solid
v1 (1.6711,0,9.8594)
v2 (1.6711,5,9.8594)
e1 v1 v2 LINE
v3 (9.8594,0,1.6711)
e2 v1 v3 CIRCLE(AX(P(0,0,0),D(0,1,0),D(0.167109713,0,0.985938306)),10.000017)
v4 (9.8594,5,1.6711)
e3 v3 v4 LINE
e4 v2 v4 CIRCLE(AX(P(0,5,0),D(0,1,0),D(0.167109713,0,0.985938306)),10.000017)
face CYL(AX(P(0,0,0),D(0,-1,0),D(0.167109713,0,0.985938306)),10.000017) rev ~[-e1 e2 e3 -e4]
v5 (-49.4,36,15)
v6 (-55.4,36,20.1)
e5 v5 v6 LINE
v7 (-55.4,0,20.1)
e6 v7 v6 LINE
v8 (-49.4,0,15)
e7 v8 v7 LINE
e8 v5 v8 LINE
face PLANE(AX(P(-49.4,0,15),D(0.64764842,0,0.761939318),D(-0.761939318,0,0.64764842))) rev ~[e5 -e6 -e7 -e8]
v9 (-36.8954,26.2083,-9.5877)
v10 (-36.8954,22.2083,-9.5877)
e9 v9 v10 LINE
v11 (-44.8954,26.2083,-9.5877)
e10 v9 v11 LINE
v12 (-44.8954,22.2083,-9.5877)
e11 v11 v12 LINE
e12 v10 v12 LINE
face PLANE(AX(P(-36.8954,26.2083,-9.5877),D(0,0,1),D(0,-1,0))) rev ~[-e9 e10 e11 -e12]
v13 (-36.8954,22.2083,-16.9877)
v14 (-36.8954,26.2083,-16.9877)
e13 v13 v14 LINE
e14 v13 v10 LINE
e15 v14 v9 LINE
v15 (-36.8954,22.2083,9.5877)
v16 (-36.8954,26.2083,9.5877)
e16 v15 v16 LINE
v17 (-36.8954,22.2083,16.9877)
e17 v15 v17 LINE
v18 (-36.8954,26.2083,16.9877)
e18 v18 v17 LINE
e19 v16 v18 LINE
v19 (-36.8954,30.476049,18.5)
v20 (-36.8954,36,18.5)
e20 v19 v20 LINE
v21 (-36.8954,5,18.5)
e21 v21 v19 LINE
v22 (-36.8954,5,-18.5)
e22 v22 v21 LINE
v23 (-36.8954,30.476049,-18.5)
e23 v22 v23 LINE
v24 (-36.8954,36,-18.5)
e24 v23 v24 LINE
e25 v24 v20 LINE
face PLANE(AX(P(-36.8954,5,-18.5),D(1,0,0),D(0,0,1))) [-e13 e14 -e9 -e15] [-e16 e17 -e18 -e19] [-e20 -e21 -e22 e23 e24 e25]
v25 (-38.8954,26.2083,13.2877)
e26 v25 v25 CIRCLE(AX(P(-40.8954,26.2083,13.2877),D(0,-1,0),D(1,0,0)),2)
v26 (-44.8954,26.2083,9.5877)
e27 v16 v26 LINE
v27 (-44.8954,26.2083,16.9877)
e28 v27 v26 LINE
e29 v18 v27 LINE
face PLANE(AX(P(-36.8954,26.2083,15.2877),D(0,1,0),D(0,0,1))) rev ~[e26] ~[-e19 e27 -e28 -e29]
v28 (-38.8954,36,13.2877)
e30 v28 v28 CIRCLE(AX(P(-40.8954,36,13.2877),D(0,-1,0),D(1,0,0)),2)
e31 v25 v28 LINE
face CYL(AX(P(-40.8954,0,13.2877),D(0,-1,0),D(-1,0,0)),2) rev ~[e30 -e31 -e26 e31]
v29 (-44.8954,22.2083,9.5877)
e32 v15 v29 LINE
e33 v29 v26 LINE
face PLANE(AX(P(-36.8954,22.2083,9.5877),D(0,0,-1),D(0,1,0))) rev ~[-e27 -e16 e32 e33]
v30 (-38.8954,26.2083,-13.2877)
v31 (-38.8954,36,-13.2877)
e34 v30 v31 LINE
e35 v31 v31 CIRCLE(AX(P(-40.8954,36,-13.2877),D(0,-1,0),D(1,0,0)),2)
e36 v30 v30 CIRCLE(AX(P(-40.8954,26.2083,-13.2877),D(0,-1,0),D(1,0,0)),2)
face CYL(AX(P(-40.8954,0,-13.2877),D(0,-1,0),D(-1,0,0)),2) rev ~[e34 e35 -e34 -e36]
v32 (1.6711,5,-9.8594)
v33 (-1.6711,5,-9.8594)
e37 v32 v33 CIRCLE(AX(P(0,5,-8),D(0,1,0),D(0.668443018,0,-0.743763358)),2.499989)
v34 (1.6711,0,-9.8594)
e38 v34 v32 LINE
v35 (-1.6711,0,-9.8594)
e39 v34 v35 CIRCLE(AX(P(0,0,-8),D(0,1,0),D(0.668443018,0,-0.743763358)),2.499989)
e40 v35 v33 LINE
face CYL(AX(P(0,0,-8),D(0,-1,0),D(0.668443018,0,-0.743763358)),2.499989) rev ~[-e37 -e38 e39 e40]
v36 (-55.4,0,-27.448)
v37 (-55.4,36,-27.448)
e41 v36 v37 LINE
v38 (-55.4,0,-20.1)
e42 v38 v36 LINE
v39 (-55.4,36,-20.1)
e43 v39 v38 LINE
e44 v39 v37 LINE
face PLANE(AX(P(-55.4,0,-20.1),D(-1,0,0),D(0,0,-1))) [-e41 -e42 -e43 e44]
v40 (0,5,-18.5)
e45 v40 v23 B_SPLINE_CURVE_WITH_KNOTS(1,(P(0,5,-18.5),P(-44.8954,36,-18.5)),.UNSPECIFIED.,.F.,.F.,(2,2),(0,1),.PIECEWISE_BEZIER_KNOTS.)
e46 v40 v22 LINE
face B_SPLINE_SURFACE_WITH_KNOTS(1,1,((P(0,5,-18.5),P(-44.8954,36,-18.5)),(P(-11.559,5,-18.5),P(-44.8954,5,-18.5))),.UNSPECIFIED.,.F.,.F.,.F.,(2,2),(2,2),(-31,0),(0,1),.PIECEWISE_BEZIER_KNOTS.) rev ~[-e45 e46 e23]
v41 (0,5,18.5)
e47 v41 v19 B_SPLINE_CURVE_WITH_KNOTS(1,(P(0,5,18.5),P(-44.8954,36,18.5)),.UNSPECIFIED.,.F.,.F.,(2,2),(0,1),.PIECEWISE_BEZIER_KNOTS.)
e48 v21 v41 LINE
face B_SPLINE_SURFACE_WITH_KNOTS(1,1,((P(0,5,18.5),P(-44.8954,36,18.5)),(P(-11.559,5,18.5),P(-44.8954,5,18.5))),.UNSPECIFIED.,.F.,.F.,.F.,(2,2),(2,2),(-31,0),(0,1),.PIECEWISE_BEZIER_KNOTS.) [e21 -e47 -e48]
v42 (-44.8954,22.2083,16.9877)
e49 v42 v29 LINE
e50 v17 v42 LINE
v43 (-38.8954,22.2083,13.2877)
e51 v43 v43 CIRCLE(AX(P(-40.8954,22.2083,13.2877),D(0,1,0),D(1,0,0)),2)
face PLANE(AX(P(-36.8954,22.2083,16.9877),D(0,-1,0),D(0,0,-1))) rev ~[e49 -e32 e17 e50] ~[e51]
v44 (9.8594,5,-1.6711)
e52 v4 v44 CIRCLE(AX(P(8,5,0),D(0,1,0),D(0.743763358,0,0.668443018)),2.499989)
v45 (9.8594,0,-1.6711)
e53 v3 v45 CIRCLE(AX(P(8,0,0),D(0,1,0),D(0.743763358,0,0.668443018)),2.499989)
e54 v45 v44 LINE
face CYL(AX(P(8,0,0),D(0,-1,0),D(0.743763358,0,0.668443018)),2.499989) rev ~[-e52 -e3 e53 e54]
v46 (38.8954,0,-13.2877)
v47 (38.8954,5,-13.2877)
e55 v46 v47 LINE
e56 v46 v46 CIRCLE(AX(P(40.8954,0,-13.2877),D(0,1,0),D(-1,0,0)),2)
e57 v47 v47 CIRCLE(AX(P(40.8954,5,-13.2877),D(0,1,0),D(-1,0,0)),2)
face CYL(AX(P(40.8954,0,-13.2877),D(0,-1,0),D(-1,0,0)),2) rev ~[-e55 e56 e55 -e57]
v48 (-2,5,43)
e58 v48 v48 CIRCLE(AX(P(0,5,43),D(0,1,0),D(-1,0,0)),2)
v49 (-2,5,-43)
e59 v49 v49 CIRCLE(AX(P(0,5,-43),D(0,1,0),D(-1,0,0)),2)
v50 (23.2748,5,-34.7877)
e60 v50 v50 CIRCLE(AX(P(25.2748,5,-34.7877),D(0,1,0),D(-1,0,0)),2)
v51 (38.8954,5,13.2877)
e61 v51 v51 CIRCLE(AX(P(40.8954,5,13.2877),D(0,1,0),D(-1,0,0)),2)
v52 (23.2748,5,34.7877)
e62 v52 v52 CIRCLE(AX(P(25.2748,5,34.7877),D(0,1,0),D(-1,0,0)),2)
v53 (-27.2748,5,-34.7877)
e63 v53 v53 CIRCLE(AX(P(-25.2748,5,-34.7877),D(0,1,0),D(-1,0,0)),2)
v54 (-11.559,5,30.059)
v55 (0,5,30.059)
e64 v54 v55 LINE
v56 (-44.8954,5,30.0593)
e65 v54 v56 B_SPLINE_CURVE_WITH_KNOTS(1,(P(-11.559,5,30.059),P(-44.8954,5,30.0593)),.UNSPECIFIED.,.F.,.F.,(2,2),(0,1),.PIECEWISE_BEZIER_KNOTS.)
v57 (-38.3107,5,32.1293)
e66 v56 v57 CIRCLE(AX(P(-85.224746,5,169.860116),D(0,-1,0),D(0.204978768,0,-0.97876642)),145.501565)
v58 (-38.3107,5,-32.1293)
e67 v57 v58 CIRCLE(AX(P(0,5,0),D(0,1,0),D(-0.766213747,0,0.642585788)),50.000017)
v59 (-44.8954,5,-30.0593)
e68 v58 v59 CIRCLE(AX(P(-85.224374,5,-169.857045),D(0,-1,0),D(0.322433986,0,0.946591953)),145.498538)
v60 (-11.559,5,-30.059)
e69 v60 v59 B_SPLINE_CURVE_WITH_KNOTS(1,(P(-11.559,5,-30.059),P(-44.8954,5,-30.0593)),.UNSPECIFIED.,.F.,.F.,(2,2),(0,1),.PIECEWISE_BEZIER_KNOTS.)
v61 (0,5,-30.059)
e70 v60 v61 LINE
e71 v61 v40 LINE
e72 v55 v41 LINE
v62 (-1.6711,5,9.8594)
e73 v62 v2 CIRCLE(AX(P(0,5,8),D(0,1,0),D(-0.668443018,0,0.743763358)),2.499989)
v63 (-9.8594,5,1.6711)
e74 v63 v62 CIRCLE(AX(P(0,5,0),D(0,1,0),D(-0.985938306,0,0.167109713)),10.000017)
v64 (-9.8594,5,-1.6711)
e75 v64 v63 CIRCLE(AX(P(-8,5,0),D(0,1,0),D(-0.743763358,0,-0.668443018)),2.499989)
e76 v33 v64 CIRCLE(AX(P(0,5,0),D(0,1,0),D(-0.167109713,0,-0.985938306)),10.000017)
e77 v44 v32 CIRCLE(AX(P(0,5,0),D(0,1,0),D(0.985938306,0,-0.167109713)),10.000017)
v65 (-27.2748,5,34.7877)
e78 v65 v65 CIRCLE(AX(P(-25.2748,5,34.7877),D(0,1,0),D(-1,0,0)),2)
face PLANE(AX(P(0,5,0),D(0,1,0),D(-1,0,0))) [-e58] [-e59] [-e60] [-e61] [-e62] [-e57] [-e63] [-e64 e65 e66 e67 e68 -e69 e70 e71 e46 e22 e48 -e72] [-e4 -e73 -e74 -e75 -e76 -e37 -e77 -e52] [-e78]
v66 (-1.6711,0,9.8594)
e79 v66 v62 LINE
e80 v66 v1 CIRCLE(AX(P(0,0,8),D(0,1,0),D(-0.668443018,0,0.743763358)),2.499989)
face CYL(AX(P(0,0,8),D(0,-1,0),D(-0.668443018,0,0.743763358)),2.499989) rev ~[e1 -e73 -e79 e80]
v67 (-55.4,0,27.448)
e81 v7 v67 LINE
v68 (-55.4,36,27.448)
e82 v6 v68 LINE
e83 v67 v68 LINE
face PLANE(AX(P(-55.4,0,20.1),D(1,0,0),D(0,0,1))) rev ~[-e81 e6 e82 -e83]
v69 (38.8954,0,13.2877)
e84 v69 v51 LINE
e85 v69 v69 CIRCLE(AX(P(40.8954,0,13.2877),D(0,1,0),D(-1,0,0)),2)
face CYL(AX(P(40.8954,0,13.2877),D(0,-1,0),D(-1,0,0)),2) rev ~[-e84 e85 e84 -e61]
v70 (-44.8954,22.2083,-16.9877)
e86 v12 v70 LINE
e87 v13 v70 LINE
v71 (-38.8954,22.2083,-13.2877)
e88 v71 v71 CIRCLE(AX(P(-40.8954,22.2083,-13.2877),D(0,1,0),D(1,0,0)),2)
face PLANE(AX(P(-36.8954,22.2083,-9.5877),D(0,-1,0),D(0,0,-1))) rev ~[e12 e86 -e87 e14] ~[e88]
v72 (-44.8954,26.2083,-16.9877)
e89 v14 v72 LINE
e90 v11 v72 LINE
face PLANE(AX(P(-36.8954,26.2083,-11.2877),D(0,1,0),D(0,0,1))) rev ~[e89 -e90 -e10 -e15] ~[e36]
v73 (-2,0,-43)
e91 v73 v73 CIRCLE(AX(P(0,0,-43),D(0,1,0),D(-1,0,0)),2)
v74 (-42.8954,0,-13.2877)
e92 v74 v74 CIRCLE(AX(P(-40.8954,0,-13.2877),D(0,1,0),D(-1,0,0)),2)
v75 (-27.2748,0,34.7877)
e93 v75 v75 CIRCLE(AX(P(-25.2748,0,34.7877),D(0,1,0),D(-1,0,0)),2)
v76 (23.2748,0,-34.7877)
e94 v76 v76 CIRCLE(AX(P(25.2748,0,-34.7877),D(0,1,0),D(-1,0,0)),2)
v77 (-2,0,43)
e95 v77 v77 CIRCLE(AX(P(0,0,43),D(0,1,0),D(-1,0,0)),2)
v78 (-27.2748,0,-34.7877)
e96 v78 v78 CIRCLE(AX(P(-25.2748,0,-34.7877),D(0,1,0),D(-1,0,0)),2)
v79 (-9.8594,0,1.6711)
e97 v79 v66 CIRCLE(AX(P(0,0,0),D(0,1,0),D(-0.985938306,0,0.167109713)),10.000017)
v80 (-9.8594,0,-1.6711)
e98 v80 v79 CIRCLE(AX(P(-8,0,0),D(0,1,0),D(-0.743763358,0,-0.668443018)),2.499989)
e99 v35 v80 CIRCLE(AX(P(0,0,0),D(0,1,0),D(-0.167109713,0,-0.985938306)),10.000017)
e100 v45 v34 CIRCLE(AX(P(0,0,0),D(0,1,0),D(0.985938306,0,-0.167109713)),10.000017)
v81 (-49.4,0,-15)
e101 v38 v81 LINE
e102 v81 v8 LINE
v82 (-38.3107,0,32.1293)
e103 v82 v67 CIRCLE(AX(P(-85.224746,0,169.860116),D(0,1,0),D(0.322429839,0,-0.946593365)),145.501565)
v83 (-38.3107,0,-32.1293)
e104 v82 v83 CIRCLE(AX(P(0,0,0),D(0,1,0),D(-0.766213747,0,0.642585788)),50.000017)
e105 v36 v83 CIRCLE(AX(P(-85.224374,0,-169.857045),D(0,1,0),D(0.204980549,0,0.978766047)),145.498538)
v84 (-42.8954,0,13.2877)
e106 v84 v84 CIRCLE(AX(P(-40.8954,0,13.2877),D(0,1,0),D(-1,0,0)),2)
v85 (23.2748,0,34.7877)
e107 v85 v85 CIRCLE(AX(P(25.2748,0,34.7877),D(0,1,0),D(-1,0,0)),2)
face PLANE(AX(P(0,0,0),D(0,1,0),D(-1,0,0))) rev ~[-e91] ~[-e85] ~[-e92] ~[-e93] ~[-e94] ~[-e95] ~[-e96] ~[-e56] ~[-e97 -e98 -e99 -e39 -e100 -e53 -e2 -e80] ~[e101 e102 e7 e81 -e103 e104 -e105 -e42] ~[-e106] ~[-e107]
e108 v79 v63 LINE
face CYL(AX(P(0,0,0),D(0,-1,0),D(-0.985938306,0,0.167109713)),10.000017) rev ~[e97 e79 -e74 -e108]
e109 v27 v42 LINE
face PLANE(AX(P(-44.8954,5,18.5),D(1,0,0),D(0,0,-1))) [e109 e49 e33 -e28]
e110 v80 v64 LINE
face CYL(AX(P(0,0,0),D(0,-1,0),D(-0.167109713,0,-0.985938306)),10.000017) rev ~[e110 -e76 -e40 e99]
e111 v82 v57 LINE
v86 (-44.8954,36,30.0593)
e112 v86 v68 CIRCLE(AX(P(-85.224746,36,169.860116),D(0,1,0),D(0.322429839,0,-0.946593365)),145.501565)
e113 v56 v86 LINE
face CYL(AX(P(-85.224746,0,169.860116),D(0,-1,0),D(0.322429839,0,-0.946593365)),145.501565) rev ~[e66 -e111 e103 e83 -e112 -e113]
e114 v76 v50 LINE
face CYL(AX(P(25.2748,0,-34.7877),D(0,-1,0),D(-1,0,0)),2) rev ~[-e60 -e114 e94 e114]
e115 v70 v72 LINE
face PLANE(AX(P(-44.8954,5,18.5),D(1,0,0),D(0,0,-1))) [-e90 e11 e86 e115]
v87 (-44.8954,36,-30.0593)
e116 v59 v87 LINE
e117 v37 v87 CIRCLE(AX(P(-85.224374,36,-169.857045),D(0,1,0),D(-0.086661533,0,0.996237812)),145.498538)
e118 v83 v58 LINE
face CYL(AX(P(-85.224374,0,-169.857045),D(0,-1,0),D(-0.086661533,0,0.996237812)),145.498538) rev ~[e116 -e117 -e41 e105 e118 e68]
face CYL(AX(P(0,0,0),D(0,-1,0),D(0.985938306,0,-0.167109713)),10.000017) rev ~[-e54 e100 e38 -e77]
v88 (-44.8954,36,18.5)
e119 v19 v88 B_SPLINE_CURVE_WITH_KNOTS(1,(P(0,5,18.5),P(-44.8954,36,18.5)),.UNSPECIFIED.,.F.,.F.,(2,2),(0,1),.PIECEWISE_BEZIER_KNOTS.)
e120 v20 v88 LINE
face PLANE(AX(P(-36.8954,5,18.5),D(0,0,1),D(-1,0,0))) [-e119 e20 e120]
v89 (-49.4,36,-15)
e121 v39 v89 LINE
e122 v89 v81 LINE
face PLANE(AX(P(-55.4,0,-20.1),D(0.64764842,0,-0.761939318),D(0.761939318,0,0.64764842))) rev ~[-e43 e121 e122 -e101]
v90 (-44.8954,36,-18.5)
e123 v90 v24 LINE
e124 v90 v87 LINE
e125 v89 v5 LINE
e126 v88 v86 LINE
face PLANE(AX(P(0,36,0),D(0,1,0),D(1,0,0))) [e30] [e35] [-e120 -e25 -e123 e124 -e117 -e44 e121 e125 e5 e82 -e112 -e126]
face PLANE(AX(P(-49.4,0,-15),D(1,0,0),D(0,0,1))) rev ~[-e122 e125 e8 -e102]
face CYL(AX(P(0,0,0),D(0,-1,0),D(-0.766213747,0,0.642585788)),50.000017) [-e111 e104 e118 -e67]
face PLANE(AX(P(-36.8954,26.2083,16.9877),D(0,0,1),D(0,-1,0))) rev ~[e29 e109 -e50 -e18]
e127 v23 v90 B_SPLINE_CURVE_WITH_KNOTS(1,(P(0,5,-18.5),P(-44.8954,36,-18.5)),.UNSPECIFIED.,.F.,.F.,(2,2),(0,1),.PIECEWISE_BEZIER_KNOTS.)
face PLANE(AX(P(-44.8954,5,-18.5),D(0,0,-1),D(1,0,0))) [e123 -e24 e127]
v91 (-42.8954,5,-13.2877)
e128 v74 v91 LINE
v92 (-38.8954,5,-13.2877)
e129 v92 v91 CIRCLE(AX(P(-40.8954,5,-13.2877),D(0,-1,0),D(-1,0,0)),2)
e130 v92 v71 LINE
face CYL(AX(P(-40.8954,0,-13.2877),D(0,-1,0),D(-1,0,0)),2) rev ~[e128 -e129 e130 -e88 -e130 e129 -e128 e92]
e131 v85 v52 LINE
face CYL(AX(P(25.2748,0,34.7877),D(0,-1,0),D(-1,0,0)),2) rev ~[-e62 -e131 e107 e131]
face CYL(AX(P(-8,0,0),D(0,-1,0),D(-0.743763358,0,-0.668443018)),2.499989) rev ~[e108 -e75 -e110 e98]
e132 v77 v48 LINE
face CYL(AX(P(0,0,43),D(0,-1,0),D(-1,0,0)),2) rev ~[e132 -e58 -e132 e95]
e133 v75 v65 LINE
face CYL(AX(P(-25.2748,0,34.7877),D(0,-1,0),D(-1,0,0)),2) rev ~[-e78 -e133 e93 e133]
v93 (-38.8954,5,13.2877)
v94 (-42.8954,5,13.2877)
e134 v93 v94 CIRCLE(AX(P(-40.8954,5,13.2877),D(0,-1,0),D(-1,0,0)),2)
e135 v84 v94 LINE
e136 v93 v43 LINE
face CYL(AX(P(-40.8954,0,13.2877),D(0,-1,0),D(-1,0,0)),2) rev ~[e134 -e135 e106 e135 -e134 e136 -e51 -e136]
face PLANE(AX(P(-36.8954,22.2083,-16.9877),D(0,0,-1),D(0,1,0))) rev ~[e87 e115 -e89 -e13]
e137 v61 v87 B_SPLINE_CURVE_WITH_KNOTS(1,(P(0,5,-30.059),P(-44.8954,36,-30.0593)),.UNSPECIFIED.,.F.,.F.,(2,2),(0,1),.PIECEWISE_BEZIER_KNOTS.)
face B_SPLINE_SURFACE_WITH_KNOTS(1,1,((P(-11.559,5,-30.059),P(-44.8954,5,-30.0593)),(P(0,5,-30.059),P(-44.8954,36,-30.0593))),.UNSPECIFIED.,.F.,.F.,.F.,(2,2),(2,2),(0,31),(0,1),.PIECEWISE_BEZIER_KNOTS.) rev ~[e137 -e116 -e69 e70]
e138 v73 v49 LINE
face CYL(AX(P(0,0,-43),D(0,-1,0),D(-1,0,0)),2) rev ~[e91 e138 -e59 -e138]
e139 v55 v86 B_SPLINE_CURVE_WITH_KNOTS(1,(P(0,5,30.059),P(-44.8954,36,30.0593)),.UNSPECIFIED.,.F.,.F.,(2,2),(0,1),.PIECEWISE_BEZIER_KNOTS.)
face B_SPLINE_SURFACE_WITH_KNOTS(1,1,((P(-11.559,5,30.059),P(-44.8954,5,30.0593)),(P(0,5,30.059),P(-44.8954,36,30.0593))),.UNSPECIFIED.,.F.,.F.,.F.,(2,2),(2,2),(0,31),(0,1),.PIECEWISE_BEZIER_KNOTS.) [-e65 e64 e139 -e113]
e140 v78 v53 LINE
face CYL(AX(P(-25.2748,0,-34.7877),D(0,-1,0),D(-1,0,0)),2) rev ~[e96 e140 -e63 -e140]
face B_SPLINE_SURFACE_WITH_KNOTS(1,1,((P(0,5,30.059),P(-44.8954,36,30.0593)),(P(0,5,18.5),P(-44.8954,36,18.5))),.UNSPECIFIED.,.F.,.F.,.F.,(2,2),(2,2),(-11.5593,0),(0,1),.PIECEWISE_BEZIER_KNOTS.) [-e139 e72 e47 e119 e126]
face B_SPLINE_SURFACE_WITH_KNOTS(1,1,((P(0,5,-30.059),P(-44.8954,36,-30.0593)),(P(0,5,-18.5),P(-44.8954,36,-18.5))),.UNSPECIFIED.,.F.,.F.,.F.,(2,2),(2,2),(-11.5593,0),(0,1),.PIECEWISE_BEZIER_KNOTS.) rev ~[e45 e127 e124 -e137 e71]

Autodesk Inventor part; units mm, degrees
ref_plane "YZ Plane" through (0, 0, 0) normal (1, 0, 0) x (0, 1, 0)
ref_plane "XZ Plane" through (0, 0, 0) normal (0, 1, 0) x (-1, 0, 0)
sketch "Эскиз12" plane through (0, 0, 0) normal (0, 1, 0) x (-1, 0, 0)
  line L0 (114.5, 15) -> (114.5, 11.5)
  line L1 (114.5, 11.5) -> (114.5, -11.5)
  line L2 (114.5, -11.5) -> (114.5, -15)
  line L3 (114.5, -15) -> (108.5, -20.1)
  line L4 (108.5, -20.1) -> (55.4, -20.1)
  line L5 (55.4, -20.1) -> (49.4, -15)
  line L6 (49.4, -15) -> (49.4, 15)
  line L7 (49.4, 15) -> (55.4, 20.1)
  line L8 (55.4, 20.1) -> (108.5, 20.1)
  line L9 (108.5, 20.1) -> (114.5, 15)
  arc A0 (-1.6711, 9.8594) -> (-9.8594, 1.6711) centre (0, 0) ccw
  arc A1 (1.6711, 9.8594) -> (-1.6711, 9.8594) centre (0, 8) ccw
  arc A2 (9.8594, 1.6711) -> (1.6711, 9.8594) centre (0, 0) ccw
  arc A3 (9.8594, -1.6711) -> (9.8594, 1.6711) centre (8, 0) ccw
  arc A4 (1.6711, -9.8594) -> (9.8594, -1.6711) centre (0, 0) ccw
  arc A5 (-1.6711, -9.8594) -> (1.6711, -9.8594) centre (0, -8) ccw
  arc A6 (-9.8594, -1.6711) -> (-1.6711, -9.8594) centre (0, 0) ccw
  arc A7 (-9.8594, 1.6711) -> (-9.8594, -1.6711) centre (-8, 0) ccw
  circle A8 centre (0, 43) radius 2
  circle A9 centre (-25.2748, 34.7877) radius 2
  circle A10 centre (-40.8954, 13.2877) radius 2
  circle A11 centre (-40.8954, -13.2877) radius 2
  circle A12 centre (-25.2748, -34.7877) radius 2
  circle A13 centre (0, -43) radius 2
  circle A14 centre (25.2748, -34.7877) radius 2
  circle A15 centre (40.8954, -13.2877) radius 2
  circle A16 centre (40.8954, 13.2877) radius 2
  circle A17 centre (25.2748, 34.7877) radius 2
  arc A18 (38.3107, 32.1293) -> (38.3107, -32.1293) centre (0, 0) ccw
  arc A19 (97.8335, -24.9059) -> (38.3107, -32.1293) centre (85.2244, -169.8586) ccw
  arc A20 (97.8335, -24.9059) -> (97.8335, 24.9059) centre (100, 0) ccw
  arc A21 (38.3107, 32.1293) -> (97.8335, 24.9059) centre (85.2244, 169.8586) ccw
  circle A22 centre (52.2, 11) radius 1.025
  circle A23 centre (52.2, -11) radius 1.025
  circle A24 centre (60, -17.3) radius 1.025
  circle A25 centre (60, 17.3) radius 1.025
  line L10 (55, -11.5) -> (55, 11.5)
  arc A26 (58, 14.5) -> (55, 11.5) centre (58, 11.5) ccw
  line L11 (58, 14.5) -> (111.5, 14.5)
  arc A27 (55, -11.5) -> (58, -14.5) centre (58, -11.5) ccw
  line L12 (111.5, -14.5) -> (58, -14.5)
  arc A28 (111.5, -14.5) -> (114.5, -11.5) centre (111.5, -11.5) ccw
  arc A29 (114.5, 11.5) -> (111.5, 14.5) centre (111.5, 11.5) ccw
  line L13 (40.8954, 13.2877) -> (40.8954, -13.2877)
  line L14 (36.8954, 18.5) -> (44.8954, 18.5)
  line L15 (44.8954, 18.5) -> (44.8954, -18.5)
  line L16 (44.8954, -18.5) -> (36.8954, -18.5)
  line L17 (36.8954, -18.5) -> (36.8954, 18.5)
  line L18 (36.8954, 18.5) -> (44.8954, -18.5) construction
  line L19 (44.8954, 18.5) -> (36.8954, -18.5) construction
  line L20 (44.8954, -18.5) -> (44.8954, -30.0593)
  line L21 (55.4, -20.1) -> (55.4, -27.448)
  line L22 (55.4, 20.1) -> (55.4, 27.448)
  line L23 (44.8954, 18.5) -> (44.8954, 30.0593)
  point P0 (40.8954, 0)
  dimension "d45" = 8
  dimension "d46" = 37
extrude "Выдавливание9" add sketch "Эскиз12" along normal blind 5 contours L7 L6 L5 L21 A19 L20 L15 L23 A21 L22 | L23 L14 L17 L16 L20 A19 A18 A21 | L15 L16 L17 L14
sketch "Эскиз13" plane through (0, 5, 0) normal (0, 1, 0) x (1, 0, 0)
  line L0 (-114.5, -15) -> (-114.5, -11.5)
  line L1 (-114.5, -11.5) -> (-114.5, 11.5)
  line L2 (-114.5, 11.5) -> (-114.5, 15)
  line L3 (-114.5, 15) -> (-108.5, 20.1)
  line L4 (-108.5, 20.1) -> (-55.4, 20.1)
  line L5 (-55.4, 20.1) -> (-49.4, 15)
  line L6 (-49.4, 15) -> (-49.4, -15)
  line L7 (-49.4, -15) -> (-55.4, -20.1)
  line L8 (-55.4, -20.1) -> (-108.5, -20.1)
  line L9 (-108.5, -20.1) -> (-114.5, -15)
  arc A0 (1.6711, -9.8594) -> (9.8594, -1.6711) centre (0, 0) ccw
  arc A1 (-1.6711, -9.8594) -> (1.6711, -9.8594) centre (0, -8) ccw
  arc A2 (-9.8594, -1.6711) -> (-1.6711, -9.8594) centre (0, 0) ccw
  arc A3 (-9.8594, 1.6711) -> (-9.8594, -1.6711) centre (-8, 0) ccw
  arc A4 (-1.6711, 9.8594) -> (-9.8594, 1.6711) centre (0, 0) ccw
  arc A5 (1.6711, 9.8594) -> (-1.6711, 9.8594) centre (0, 8) ccw
  arc A6 (9.8594, 1.6711) -> (1.6711, 9.8594) centre (0, 0) ccw
  arc A7 (9.8594, -1.6711) -> (9.8594, 1.6711) centre (8, 0) ccw
  circle A8 centre (0, -43) radius 2
  circle A9 centre (25.2748, -34.7877) radius 2
  circle A10 centre (40.8954, -13.2877) radius 2
  circle A11 centre (40.8954, 13.2877) radius 2
  circle A12 centre (25.2748, 34.7877) radius 2
  circle A13 centre (0, 43) radius 2
  circle A14 centre (-25.2748, 34.7877) radius 2
  circle A15 centre (-40.8954, 13.2877) radius 2
  circle A16 centre (-40.8954, -13.2877) radius 2
  circle A17 centre (-25.2748, -34.7877) radius 2
  arc A18 (-38.3107, -32.1293) -> (-38.3107, 32.1293) centre (0, 0) ccw
  arc A19 (-97.8335, 24.9059) -> (-38.3107, 32.1293) centre (-85.2244, 169.8586) ccw
  arc A20 (-97.8335, 24.9059) -> (-97.8335, -24.9059) centre (-100, 0) ccw
  arc A21 (-38.3107, -32.1293) -> (-97.8335, -24.9059) centre (-85.2244, -169.8586) ccw
  circle A22 centre (-52.2, -11) radius 1.025
  circle A23 centre (-52.2, 11) radius 1.025
  circle A24 centre (-60, 17.3) radius 1.025
  circle A25 centre (-60, -17.3) radius 1.025
  line L10 (-55, 11.5) -> (-55, -11.5)
  arc A26 (-58, -14.5) -> (-55, -11.5) centre (-58, -11.5) ccw
  line L11 (-58, -14.5) -> (-111.5, -14.5)
  arc A27 (-55, 11.5) -> (-58, 14.5) centre (-58, 11.5) ccw
  line L12 (-111.5, 14.5) -> (-58, 14.5)
  arc A28 (-111.5, 14.5) -> (-114.5, 11.5) centre (-111.5, 11.5) ccw
  arc A29 (-114.5, -11.5) -> (-111.5, -14.5) centre (-111.5, -11.5) ccw
  line L13 (-40.8954, -13.2877) -> (-40.8954, 13.2877)
  line L14 (-36.8954, -18.5) -> (-44.8954, -18.5)
  line L15 (-44.8954, -18.5) -> (-44.8954, 18.5)
  line L16 (-44.8954, 18.5) -> (-36.8954, 18.5)
  line L17 (-36.8954, 18.5) -> (-36.8954, -18.5)
  line L18 (-36.8954, -18.5) -> (-44.8954, 18.5) construction
  line L19 (-44.8954, -18.5) -> (-36.8954, 18.5) construction
  line L20 (-44.8954, 18.5) -> (-44.8954, 30.0593)
  line L21 (-55.4, 20.1) -> (-55.4, 27.448)
  line L22 (-55.4, -20.1) -> (-55.4, -27.448)
  line L23 (-44.8954, -18.5) -> (-44.8954, -30.0593)
  point P0 (0, 0)
  point P1 (-40.8954, 0)
  dimension "d49" = 8
  dimension "d50" = 37
extrude "Выдавливание10" add sketch "Эскиз13" along normal blind 31 contours L7 L6 L5 L21 A19 L20 L15 L23 A21 L22 | L15 L16 L17 L14
sketch "Эскиз14" plane through (-36.8954, 5, 18.5) normal (1, 0, 0) x (0, 0, -1)
  line L0 (3.2123, 0) -> (3.2123, 31) projected
  line L1 (7.2123, 0) -> (7.2123, 31) projected
  line L2 (29.7877, 0) -> (29.7877, 31) projected
  line L3 (33.7877, 0) -> (33.7877, 31) projected
  line L4 (3.2123, 19.2083) -> (7.2123, 19.2083)
  line L5 (1.5123, 17.2083) -> (8.9123, 17.2083)
  line L6 (8.9123, 17.2083) -> (8.9123, 21.2083)
  line L7 (8.9123, 21.2083) -> (1.5123, 21.2083)
  line L8 (1.5123, 21.2083) -> (1.5123, 17.2083)
  line L9 (1.5123, 17.2083) -> (8.9123, 21.2083) construction
  line L10 (8.9123, 17.2083) -> (1.5123, 21.2083) construction
  line L11 (29.7877, 19.2083) -> (33.7877, 19.2083)
  line L12 (28.0877, 17.2083) -> (35.4877, 17.2083)
  line L13 (35.4877, 17.2083) -> (35.4877, 21.2083)
  line L14 (35.4877, 21.2083) -> (28.0877, 21.2083)
  line L15 (28.0877, 21.2083) -> (28.0877, 17.2083)
  line L16 (28.0877, 17.2083) -> (35.4877, 21.2083) construction
  line L17 (35.4877, 17.2083) -> (28.0877, 21.2083) construction
  point P0 (5.2123, 19.2083)
  point P1 (31.7877, 19.2083)
  dimension "d53" = 7.4
  dimension "d54" = 4
  dimension "d55" = 7.4
  dimension "d56" = 4
extrude "Выдавливание11" cut sketch "Эскиз14" against normal blind 8
sketch "Эскиз16" plane through (0, 5, 0) normal (0, 1, 0) x (1, 0, 0)
  line L0 (0, -18.5) -> (-11.559, -18.5)
  line L1 (-11.559, -18.5) -> (-11.559, -30.059)
  line L2 (-11.559, -30.059) -> (0, -30.059)
  line L3 (0, -30.059) -> (0, -18.5)
  point P0 (0, 0)
  point P1 (-5.7795, -24.2795)
  dimension "d60" = 11.559
  dimension "d61" = 11.559
loft "Лофт1" add profiles "Эскиз16" section 2 edges at (-44.8954, 20.5, 18.5) (-44.8954, 36, 24.2797) (-44.8954, 20.5, 30.0593) (-44.8954, 5, 24.2797)
ref_plane "РабПлоскость2" through (-36.8954, 36, 0) normal (0, 0, -1) x (-1, 0, 0)
mirror "Зеркальное отражение2" about plane through (-36.8954, 36, 0) normal (0, 0, -1) of "Лофт1"
sketch "Эскиз17" plane through (0, 36, 0) normal (0, 1, 0) x (1, 0, 0)
  circle A0 centre (-40.8954, -13.2877) radius 2 projected
  circle A1 centre (-40.8954, 13.2877) radius 2 projected
  line L0 (-36.8954, -18.5) -> (-36.8954, 18.5) projected
  line L1 (-36.8954, 18.5) -> (-44.8954, 18.5) projected
  line L2 (-44.8954, 18.5) -> (-44.8954, 30.0593) projected
  arc A2 (-55.4, 27.448) -> (-44.8954, 30.0593) centre (-85.2244, 169.8586) ccw projected
  line L3 (-55.4, 27.448) -> (-55.4, 20.1) projected
  line L4 (-55.4, 20.1) -> (-49.4, 15) projected
  line L5 (-49.4, 15) -> (-49.4, -15) projected
  line L6 (-49.4, -15) -> (-55.4, -20.1) projected
  line L7 (-55.4, -20.1) -> (-55.4, -27.448) projected
  arc A3 (-44.8954, -30.0593) -> (-55.4, -27.448) centre (-85.2244, -169.8586) ccw projected
  line L8 (-44.8954, -30.0593) -> (-44.8954, -18.5) projected
  line L9 (-44.8954, -18.5) -> (-36.8954, -18.5) projected
  point P0 (0, 0)
properties part number "000.302 - Кожух" material "Пластик АБС"
